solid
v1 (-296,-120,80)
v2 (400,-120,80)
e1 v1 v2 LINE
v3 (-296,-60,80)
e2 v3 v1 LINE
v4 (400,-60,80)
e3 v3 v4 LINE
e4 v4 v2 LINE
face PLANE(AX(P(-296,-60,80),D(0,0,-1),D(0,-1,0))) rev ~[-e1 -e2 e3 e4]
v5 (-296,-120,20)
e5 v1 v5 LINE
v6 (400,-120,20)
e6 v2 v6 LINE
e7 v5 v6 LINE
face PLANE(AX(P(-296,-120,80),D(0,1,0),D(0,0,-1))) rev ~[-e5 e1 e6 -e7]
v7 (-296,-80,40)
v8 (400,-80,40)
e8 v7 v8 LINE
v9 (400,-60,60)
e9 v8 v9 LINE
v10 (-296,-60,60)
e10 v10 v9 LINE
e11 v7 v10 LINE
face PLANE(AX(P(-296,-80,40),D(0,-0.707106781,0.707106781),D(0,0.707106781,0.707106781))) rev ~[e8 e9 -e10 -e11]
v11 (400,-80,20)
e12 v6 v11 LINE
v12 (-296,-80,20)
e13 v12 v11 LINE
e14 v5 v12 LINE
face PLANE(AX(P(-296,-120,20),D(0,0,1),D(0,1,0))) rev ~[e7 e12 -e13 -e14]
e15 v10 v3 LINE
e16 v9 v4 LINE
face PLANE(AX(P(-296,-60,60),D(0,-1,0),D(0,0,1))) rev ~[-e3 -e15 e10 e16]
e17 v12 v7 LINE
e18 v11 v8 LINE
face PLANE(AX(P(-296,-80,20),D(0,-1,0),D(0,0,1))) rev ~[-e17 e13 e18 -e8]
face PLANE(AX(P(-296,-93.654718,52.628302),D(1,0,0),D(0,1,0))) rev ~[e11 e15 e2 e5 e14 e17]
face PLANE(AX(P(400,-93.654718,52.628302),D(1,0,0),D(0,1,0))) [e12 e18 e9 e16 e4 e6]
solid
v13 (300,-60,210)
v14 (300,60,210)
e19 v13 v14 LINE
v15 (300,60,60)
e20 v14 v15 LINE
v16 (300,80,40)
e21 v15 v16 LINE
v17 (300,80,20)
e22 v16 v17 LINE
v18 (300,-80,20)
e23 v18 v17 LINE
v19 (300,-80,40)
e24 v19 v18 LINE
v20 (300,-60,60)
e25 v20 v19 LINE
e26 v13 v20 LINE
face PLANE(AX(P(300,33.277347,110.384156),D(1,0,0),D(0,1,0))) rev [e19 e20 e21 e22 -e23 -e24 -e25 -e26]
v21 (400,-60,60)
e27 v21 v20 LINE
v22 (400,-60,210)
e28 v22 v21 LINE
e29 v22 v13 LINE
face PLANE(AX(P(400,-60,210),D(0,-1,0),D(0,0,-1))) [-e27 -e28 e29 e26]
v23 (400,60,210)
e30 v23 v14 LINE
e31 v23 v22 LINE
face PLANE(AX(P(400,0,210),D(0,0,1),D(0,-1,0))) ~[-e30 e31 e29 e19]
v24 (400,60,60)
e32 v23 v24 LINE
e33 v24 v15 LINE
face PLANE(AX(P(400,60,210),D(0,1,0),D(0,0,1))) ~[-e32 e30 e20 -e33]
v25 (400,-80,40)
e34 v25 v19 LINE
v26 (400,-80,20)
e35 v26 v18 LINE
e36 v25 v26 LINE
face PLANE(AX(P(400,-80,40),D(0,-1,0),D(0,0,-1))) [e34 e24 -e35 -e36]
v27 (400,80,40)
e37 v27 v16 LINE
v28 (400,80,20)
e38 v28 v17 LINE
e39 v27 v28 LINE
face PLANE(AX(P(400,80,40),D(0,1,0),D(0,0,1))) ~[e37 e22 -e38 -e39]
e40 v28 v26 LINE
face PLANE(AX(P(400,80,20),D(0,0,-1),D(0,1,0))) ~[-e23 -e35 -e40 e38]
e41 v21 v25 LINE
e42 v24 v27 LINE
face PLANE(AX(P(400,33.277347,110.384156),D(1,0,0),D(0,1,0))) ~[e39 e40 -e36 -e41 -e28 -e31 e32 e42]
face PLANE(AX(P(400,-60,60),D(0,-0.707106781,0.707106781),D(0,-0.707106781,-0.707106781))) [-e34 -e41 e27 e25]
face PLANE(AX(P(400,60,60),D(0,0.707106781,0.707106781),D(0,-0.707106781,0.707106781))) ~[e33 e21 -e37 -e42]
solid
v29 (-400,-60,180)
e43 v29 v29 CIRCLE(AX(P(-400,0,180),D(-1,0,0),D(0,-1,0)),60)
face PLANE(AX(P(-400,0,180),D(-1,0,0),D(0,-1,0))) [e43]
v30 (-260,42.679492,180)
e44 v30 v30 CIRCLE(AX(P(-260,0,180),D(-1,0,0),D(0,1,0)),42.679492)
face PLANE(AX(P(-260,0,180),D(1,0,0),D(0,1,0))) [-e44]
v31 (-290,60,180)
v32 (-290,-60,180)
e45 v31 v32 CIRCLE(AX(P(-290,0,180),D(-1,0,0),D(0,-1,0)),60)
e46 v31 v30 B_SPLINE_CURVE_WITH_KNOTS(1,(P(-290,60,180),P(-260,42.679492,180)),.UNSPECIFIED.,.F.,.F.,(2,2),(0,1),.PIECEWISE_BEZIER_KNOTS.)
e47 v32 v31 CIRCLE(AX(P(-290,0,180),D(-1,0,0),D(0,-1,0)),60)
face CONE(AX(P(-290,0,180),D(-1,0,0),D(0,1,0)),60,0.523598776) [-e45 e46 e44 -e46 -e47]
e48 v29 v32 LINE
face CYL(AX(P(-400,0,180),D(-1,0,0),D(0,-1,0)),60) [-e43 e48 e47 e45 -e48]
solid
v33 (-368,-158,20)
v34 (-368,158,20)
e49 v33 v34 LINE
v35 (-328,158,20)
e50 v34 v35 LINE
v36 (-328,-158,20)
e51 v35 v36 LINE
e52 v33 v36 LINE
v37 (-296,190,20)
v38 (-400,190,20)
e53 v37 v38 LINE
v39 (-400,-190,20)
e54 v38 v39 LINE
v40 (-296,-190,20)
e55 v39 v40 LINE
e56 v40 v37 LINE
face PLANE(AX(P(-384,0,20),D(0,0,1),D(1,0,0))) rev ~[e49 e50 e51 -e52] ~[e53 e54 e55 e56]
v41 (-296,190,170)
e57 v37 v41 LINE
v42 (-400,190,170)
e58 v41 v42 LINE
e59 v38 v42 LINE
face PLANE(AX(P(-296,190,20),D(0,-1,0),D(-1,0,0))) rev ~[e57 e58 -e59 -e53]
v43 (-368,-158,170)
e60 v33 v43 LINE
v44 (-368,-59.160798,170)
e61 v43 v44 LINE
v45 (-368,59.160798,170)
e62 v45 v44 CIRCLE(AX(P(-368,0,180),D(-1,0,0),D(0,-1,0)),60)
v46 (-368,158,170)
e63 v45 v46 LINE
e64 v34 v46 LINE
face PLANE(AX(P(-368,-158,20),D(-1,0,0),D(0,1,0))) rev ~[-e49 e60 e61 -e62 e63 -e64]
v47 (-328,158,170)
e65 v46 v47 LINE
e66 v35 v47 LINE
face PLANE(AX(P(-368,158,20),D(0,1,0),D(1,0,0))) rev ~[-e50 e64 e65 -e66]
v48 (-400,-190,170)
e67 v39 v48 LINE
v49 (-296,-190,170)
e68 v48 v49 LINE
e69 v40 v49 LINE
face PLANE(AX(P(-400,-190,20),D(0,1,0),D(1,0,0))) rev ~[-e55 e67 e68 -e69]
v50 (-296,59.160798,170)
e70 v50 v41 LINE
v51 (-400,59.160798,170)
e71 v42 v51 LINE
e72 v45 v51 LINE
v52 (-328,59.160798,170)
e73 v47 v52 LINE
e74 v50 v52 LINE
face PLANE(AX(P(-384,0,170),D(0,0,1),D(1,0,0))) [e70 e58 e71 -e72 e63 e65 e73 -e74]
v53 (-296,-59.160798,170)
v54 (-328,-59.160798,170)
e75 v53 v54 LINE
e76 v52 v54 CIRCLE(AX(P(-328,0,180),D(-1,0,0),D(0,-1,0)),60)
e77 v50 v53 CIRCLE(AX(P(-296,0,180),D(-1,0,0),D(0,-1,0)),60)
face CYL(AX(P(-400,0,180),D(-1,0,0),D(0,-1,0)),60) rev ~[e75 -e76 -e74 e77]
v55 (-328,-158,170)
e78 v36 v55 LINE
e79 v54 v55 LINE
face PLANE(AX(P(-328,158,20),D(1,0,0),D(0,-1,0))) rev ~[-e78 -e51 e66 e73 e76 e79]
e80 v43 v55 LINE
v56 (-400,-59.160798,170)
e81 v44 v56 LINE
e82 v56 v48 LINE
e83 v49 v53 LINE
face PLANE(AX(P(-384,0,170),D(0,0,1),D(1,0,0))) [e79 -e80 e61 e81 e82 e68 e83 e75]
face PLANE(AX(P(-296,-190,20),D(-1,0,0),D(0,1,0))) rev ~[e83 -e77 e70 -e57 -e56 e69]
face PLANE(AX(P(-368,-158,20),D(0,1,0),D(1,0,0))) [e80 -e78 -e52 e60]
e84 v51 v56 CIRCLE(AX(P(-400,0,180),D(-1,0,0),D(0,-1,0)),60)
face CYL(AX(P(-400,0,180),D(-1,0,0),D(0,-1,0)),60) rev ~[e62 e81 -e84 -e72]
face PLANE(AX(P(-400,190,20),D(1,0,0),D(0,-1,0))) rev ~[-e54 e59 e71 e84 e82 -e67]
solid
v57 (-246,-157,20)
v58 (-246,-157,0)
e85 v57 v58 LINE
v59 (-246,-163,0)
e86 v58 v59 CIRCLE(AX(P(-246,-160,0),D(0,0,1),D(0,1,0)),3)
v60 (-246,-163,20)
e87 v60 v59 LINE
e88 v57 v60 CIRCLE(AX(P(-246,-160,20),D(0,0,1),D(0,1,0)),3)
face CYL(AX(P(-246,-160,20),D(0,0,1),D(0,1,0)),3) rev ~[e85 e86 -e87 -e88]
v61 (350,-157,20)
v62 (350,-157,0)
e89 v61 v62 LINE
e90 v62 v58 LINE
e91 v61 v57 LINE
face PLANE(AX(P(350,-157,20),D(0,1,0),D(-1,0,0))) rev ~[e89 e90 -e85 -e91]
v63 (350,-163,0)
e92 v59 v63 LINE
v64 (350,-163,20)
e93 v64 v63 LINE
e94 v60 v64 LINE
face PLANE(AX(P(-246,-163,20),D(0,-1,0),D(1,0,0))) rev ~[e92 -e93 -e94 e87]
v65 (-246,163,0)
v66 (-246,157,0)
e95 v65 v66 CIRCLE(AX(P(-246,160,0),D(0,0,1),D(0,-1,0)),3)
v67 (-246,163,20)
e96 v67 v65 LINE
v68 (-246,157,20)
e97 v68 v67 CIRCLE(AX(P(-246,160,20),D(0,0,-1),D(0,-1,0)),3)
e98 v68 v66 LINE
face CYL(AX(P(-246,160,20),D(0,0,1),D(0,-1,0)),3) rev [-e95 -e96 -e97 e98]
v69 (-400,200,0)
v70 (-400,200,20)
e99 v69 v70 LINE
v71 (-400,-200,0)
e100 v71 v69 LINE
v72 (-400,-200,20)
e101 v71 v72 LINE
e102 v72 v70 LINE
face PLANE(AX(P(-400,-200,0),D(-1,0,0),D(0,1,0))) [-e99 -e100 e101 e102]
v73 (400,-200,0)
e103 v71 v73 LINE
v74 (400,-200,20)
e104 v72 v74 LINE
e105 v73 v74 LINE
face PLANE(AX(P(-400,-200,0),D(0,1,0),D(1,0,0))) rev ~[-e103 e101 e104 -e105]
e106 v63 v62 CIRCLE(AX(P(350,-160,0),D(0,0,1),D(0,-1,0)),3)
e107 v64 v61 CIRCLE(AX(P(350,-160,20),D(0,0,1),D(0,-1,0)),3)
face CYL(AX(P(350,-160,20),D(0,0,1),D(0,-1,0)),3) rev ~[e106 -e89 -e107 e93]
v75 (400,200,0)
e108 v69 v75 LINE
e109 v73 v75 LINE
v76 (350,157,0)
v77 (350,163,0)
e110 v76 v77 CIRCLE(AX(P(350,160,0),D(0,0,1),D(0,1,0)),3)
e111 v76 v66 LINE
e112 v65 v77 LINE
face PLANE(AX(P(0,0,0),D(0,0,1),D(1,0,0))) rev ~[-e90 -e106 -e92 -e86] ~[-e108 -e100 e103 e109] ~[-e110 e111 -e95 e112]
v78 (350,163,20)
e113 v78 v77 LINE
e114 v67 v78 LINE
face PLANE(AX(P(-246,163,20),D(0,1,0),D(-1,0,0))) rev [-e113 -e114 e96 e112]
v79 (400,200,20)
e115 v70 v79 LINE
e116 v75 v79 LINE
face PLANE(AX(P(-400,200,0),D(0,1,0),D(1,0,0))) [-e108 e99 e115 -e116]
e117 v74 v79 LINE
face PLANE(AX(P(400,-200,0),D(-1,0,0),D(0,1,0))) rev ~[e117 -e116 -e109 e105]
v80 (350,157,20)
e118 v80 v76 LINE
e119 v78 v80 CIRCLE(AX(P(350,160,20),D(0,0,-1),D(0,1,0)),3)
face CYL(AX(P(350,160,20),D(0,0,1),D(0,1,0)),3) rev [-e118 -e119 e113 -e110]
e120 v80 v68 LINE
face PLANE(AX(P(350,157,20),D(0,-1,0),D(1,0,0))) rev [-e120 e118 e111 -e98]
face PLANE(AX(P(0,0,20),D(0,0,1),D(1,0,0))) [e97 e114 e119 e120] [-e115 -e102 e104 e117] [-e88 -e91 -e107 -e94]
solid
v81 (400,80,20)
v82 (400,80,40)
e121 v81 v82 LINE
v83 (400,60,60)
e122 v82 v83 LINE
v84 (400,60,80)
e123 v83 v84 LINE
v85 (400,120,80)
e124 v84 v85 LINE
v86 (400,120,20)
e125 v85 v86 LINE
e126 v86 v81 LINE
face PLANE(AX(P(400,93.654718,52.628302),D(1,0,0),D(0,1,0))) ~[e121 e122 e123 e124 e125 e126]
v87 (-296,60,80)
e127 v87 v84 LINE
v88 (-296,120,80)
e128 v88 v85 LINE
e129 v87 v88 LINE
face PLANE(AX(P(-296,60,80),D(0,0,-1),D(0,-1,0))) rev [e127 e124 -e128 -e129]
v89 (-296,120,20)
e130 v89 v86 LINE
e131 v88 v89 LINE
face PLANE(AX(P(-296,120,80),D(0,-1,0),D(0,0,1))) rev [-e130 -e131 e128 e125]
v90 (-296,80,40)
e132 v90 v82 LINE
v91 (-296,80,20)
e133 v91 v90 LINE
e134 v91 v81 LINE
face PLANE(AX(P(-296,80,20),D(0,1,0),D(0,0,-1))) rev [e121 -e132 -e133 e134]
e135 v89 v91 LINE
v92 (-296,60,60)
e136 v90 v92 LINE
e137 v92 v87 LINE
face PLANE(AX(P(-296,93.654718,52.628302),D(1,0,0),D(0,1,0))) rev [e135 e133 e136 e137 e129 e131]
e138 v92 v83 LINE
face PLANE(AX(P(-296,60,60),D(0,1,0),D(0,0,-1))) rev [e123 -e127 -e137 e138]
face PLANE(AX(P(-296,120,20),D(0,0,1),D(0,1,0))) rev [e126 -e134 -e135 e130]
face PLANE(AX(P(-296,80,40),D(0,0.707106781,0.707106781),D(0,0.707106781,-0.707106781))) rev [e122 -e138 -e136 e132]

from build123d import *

# Parameters (mm, degrees)
F0_W      = 800
F0_H      = 400
F1_DEPTH  = 20
F2_W      = 40
F2_H      = 32
F3_DEPTH  = 150
F5_DEPTH  = 800.001
F6_R      = 60
F7_DEPTH  = 110
F8_R      = 60
F9_DEPTH  = 30
F9_TAPER  = 30
F11_DEPTH = 696
F14_DEPTH = 100
F17_DEPTH = 20.001


# Not quite as in the source:
# - a pattern or mirror of a feature is missing from the dataset's text; its kind, count and spacing are read off the source's solid


with BuildPart() as f1:
    # F0 (on Top) → F1 (new body)
    with BuildSketch(Plane.XY):
        Rectangle(F0_W, F0_H)
    extrude(amount=F1_DEPTH)

    # F16 (on face) → F17 (cut, through all)
    with BuildSketch(Plane.XY.offset(20)):
        with BuildLine():
            ThreePointArc((-246, -157), (-249, -160), (-246, -163))
            Line((-246, -163), (350, -163))
            ThreePointArc((350, -163), (353, -160), (350, -157))
            Line((350, -157), (-246, -157))
        make_face()
    f17 = extrude(amount=-F17_DEPTH, mode=Mode.SUBTRACT)

    # F17_copies: F17 across plane
    add(f17.mirror(Plane.ZX), mode=Mode.SUBTRACT)


with BuildPart() as f3:
    # F2 (on face) → F3 (new body)
    with BuildSketch(Plane.XY.offset(20)):
        Polygon((-400, 190), (-400, -190), (-368, -190), (-368, -158), (-368, 158), (-368, 190), align=None)
        Polygon((-328, -158), (-328, -190), (-296, -190), (-296, 190), (-328, 190), (-328, 158), align=None)
        with Locations((-348, -174)):
            Rectangle(F2_W, F2_H)
        with Locations((-348, 174)):
            Rectangle(F2_W, F2_H)
    extrude(amount=F3_DEPTH)

    # F4 (on face) → F5 (cut, through all)
    with BuildSketch(Plane(origin=(-400, 0, 0), x_dir=(0, -1, 0), z_dir=(-1, 0, 0))):
        with BuildLine():
            ThreePointArc((59.160797831, 170), (59.7898313673, 174.9824243832), (60, 180))
            ThreePointArc((60, 180), (-5.0175756168, 239.7898313673), (-59.160797831, 170))
            Line((-59.160797831, 170), (59.160797831, 170))
        make_face()
        with BuildLine():
            Line((59.160797831, 170), (-59.160797831, 170))
            ThreePointArc((-59.160797831, 170), (0, 120), (59.160797831, 170))
        make_face()
    extrude(amount=-F5_DEPTH, mode=Mode.SUBTRACT)


with BuildPart() as f7:
    # F6 (on face) → F7 (new body)
    with BuildSketch(Plane(origin=(-400, 0, 0), x_dir=(0, -1, 0), z_dir=(-1, 0, 0))):
        with Locations((0, 180)):
            Circle(F6_R)
    extrude(amount=-F7_DEPTH)

    # F8 (on face) → F9 (join)
    with BuildSketch(Plane.YZ.offset(-290)):
        with Locations((0, 180)):
            Circle(F8_R)
    extrude(amount=F9_DEPTH, taper=F9_TAPER)


with BuildPart() as f11:
    # F10 (on face) → F11 (new body, through all)
    with BuildSketch(Plane.YZ.offset(-296)):
        Polygon((-120, 20), (-80, 20), (-80, 40), (-60, 60), (-60, 80), (-120, 80), align=None)
    extrude(amount=F11_DEPTH)


with BuildPart() as f12_1:
    # F12: instance of F11
    add(f11.part.mirror(Plane.XZ))


with BuildPart() as f14:
    # F13 (on face) → F14 (new body)
    with BuildSketch(Plane.YZ.offset(400)):
        Polygon((-80, 40), (-80, 20), (0, 20), (0, 210), (-60, 210), (-60, 60), align=None)
    extrude(amount=-F14_DEPTH)

    # F15: F14 across face


with BuildPart() as f14_1:
    add(f14.part)
    add(f14.part.mirror(Plane(origin=(350, 0, 115), x_dir=(-1, 0, 0), z_dir=(0, 1, 0))))


solid = Compound([f1.part, f3.part, f7.part, f11.part, f12_1.part, f14_1.part])
